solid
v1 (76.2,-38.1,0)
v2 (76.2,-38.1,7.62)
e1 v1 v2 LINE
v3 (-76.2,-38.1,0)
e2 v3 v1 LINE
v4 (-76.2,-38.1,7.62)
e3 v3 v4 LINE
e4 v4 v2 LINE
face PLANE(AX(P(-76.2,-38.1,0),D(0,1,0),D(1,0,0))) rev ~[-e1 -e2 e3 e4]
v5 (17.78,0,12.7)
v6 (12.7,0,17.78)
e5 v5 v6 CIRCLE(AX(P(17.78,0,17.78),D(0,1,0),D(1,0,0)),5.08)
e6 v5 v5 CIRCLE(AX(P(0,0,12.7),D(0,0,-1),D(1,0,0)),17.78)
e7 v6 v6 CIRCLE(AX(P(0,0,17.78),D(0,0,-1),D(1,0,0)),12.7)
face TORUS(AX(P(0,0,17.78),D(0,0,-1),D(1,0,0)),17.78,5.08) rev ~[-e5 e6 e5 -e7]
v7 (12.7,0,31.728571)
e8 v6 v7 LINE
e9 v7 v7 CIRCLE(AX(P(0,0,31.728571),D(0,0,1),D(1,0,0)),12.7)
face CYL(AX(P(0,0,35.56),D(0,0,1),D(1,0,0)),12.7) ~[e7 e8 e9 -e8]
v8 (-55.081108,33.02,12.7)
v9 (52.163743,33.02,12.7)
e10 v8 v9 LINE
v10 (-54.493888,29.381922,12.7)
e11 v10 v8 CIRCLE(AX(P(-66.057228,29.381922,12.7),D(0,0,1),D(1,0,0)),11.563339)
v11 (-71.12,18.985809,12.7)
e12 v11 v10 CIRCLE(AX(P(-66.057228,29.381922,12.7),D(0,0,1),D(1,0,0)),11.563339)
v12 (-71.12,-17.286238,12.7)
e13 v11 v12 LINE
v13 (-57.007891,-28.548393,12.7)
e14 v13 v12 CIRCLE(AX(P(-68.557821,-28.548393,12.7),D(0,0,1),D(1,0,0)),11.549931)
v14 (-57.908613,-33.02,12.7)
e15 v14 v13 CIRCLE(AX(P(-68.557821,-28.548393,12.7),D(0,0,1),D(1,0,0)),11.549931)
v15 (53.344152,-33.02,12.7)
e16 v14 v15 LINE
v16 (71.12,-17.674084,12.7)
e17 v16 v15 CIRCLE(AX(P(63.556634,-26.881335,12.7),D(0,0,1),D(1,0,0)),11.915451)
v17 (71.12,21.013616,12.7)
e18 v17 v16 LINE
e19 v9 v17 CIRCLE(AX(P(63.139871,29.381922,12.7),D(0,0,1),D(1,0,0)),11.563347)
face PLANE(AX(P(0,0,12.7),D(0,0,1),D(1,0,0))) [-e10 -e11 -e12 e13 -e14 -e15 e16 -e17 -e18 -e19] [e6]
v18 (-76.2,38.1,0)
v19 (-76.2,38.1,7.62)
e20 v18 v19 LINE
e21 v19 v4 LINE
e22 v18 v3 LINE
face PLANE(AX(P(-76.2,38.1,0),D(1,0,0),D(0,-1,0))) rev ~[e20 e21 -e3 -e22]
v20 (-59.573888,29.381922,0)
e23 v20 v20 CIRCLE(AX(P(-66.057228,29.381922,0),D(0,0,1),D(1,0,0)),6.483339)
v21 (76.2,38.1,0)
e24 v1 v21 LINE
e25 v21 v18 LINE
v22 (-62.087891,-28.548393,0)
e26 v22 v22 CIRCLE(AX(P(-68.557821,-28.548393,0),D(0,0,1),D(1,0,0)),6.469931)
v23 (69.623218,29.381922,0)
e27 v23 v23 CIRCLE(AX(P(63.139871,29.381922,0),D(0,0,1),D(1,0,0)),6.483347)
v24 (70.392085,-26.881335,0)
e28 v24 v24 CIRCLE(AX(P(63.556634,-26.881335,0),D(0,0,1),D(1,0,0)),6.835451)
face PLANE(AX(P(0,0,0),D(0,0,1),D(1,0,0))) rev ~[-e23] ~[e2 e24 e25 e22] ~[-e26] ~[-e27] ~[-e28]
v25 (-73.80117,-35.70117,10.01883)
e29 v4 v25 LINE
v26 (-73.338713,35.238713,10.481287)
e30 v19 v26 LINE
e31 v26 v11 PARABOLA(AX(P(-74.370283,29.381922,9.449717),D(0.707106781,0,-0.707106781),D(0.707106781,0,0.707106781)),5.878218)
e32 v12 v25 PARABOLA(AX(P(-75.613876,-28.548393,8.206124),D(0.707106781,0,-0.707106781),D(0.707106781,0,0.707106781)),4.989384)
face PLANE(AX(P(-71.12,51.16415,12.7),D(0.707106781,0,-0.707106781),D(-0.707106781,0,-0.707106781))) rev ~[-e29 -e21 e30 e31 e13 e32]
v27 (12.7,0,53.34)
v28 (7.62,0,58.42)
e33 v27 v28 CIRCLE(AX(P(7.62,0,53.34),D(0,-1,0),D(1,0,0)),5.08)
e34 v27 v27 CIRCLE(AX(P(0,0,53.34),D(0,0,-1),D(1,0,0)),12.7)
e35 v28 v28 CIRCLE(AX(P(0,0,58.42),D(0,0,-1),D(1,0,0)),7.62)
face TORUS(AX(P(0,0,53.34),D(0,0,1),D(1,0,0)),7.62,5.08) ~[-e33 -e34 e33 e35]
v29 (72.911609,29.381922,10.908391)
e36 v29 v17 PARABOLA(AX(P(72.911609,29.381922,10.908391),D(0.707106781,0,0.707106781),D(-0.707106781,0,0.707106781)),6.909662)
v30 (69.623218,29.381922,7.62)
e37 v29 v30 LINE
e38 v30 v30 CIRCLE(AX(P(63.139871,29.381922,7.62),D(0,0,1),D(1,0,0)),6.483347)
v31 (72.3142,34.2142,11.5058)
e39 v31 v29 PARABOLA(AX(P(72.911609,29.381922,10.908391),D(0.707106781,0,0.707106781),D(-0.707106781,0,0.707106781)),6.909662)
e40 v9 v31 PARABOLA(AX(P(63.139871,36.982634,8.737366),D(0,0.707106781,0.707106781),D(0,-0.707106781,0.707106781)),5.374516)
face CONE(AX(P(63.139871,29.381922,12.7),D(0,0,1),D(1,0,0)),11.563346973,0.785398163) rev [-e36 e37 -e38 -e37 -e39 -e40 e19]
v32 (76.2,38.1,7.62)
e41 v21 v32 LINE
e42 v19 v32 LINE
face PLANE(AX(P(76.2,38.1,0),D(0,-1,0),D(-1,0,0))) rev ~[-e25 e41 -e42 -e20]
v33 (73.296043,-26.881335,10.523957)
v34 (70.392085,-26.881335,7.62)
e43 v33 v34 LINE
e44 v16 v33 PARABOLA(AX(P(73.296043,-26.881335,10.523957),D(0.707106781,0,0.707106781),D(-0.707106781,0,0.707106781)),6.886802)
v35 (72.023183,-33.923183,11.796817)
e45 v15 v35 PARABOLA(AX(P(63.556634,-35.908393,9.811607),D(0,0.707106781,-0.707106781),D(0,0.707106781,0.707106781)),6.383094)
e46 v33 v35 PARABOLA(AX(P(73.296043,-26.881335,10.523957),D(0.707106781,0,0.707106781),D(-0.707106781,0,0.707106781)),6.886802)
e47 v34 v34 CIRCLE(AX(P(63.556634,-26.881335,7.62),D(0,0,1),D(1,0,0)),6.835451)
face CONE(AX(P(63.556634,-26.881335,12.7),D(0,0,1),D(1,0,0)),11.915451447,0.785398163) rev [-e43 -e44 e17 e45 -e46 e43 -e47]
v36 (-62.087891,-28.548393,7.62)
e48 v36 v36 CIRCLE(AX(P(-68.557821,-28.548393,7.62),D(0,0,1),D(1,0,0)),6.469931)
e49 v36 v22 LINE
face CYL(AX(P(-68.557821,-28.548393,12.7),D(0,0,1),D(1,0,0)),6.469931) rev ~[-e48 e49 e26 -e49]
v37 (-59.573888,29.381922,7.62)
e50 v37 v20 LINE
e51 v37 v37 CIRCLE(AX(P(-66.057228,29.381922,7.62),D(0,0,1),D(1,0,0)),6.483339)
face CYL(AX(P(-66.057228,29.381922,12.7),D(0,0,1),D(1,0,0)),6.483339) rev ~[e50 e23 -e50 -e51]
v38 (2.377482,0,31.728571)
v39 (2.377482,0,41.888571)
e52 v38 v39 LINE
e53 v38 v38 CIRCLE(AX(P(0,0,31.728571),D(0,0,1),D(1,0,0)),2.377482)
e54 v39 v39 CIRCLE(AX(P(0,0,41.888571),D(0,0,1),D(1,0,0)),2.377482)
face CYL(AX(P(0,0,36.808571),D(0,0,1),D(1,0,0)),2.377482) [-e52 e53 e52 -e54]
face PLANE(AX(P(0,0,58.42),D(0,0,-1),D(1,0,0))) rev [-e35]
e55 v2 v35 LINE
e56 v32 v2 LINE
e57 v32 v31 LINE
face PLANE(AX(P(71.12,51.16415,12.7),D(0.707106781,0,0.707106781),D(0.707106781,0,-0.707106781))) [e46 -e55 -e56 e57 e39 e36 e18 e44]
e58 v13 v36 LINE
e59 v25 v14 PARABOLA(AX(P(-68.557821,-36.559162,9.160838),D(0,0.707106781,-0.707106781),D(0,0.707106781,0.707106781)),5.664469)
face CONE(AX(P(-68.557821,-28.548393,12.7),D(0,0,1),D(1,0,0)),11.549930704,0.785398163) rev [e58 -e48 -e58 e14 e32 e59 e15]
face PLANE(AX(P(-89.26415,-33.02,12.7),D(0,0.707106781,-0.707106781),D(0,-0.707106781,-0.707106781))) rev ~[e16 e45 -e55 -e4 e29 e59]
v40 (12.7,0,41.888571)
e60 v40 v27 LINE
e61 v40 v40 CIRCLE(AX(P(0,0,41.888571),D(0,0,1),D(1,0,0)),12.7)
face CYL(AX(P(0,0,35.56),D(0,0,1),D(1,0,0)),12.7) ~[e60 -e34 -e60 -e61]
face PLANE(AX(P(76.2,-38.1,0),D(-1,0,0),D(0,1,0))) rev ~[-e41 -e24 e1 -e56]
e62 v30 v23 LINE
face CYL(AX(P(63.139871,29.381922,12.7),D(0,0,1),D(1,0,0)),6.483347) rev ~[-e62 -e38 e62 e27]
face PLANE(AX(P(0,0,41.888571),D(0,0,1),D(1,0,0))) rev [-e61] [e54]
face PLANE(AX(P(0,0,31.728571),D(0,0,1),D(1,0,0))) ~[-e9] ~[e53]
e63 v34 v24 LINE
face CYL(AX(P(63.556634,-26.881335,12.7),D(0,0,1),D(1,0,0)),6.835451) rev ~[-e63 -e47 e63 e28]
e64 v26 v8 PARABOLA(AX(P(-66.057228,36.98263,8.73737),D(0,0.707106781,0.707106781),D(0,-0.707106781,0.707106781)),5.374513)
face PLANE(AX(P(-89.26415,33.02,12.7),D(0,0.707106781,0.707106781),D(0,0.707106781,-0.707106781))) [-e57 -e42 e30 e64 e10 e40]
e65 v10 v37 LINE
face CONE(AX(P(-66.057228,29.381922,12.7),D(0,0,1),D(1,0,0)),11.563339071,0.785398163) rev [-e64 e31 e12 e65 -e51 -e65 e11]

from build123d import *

# Parameters (mm, degrees)
F1_DEPTH     = 12.7
F3_R         = 7.826189497
F3_R_2       = 7.6449247614
F3_R_3       = 9.3914167861
F3_R_4       = 7.5169302634
F2_R         = 6.8354514468
F2_R_2       = 6.4833469735
F2_R_3       = 6.4699307045
F2_R_4       = 6.483339071
F4_DEPTH     = 25.4
F5_W         = 12.7
F5_H         = 45.72
F7_W         = 12.7
F7_H         = 10.16
F9_R         = 5.08
F10_T1_DEPTH = 102.3282991577
F10_T3_DEPTH = 178.5282991577


# Not quite as in the source:
# - a fillet or chamfer that OpenCascade refuses, or shapes differently, is made with other operations: its cross-section is extruded or revolved along the edge and cut away or added


with BuildPart() as f1:
    # F0 (on Top) → F1 (new body)
    with BuildSketch(Plane.XY):
        Polygon((76.2, 21.421205096), (76.2, 38.1), (-76.2, 38.1), (-76.2, -38.1), (76.2, -38.1), align=None)
    extrude(amount=F1_DEPTH)

    # F3 (on face) + F2 (on face) → F4 (cut)
    with BuildSketch(Plane.XY):
        with Locations((-66.4894506335, 28.616681695)):
            Circle(F3_R)
        with Locations((60.850225389, 29.538076371)):
            Circle(F3_R_2)
        with Locations((62.7190470695, -24.263875559)):
            Circle(F3_R_3)
        with Locations((-67.1401694417, -24.8782932758)):
            Circle(F3_R_4)
    with BuildSketch(Plane.XY.offset(12.7)):
        with Locations((63.5566338897, -26.8813353032)):
            Circle(F2_R)
        with Locations((63.1398707628, 29.3819215149)):
            Circle(F2_R_2)
        with Locations((-68.5578212142, -28.5483933985)):
            Circle(F2_R_3)
        with Locations((-66.0572275519, 29.3819215149)):
            Circle(F2_R_4)
    extrude(amount=-F4_DEPTH, mode=Mode.SUBTRACT)

    # F5 (on Front) → F6 (revolve)
    with BuildSketch(Plane.XZ):
        with Locations((6.35, 35.56)):
            Rectangle(F5_W, F5_H)
    revolve(axis=Axis((0, 0, 35.56), (0, 0, -1)))

    # F7 (on Front) → F8 (revolve, cut)
    with BuildSketch(Plane.XZ):
        with Locations((8.7274818003, 36.8085707384)):
            Rectangle(F7_W, F7_H)
    revolve(axis=Axis((0, 0, 12.7), (0, 0, 1)), mode=Mode.SUBTRACT)

    # F9
    f9_edges = [f1.edges().sort_by_distance(p)[0] for p in [
        (-12.7, 0, 58.42),
        (-12.7, 0, 12.7),
    ]]
    fillet(f9_edges, radius=F9_R)

    # F10: chamfer of 5.08 on 9 edges, made by hand

    # F10_s2 → F10_t1 (cut)
    with BuildSketch(Plane.XZ.offset(-51.1641495789)):
        Polygon((71.12, 12.7), (76.2, 7.62), (76.2, 12.7), align=None)
        Polygon((-71.12, 12.7), (-76.2, 7.62), (-76.2, 12.7), align=None)
    extrude(amount=F10_T1_DEPTH, mode=Mode.SUBTRACT)

    # F10_s4 → F10_t3 (cut)
    with BuildSketch(Plane.YZ.offset(-89.2641495789)):
        Polygon((33.02, 12.7), (38.1, 7.62), (38.1, 12.7), align=None)
        Polygon((-33.02, 12.7), (-38.1, 7.62), (-38.1, 12.7), align=None)
    extrude(amount=F10_T3_DEPTH, mode=Mode.SUBTRACT)

    # F10_s5 → F10_t6 (revolve, cut)
    with BuildSketch(Plane.XZ.offset(28.5483933985)):
        Polygon((-57.0078905097, 12.7), (-62.0878905097, 7.62), (-62.0878905097, 12.7), align=None)
    revolve(axis=Axis((-68.5578212142, -28.5483933985, 12.7), (0, 0, 1)), mode=Mode.SUBTRACT)

    # F10_s7 → F10_t8 (revolve, cut)
    with BuildSketch(Plane.XZ.offset(26.8813353032)):
        Polygon((75.4720853364, 12.7), (70.3920853364, 7.62), (70.3920853364, 12.7), align=None)
    revolve(axis=Axis((63.5566338897, -26.8813353032, 12.7), (0, 0, 1)), mode=Mode.SUBTRACT)

    # F10_s9 → F10_t10 (revolve, cut)
    with BuildSketch(Plane.XZ.offset(-29.3819215149)):
        Polygon((-54.493888481, 12.7), (-59.573888481, 7.62), (-59.573888481, 12.7), align=None)
    revolve(axis=Axis((-66.0572275519, 29.3819215149, 12.7), (0, 0, 1)), mode=Mode.SUBTRACT)

    # F10_s11 → F10_t12 (revolve, cut)
    with BuildSketch(Plane.XZ.offset(-29.3819215149)):
        Polygon((74.7032177363, 12.7), (69.6232177363, 7.62), (69.6232177363, 12.7), align=None)
    revolve(axis=Axis((63.1398707628, 29.3819215149, 12.7), (0, 0, 1)), mode=Mode.SUBTRACT)


solid = f1.part
